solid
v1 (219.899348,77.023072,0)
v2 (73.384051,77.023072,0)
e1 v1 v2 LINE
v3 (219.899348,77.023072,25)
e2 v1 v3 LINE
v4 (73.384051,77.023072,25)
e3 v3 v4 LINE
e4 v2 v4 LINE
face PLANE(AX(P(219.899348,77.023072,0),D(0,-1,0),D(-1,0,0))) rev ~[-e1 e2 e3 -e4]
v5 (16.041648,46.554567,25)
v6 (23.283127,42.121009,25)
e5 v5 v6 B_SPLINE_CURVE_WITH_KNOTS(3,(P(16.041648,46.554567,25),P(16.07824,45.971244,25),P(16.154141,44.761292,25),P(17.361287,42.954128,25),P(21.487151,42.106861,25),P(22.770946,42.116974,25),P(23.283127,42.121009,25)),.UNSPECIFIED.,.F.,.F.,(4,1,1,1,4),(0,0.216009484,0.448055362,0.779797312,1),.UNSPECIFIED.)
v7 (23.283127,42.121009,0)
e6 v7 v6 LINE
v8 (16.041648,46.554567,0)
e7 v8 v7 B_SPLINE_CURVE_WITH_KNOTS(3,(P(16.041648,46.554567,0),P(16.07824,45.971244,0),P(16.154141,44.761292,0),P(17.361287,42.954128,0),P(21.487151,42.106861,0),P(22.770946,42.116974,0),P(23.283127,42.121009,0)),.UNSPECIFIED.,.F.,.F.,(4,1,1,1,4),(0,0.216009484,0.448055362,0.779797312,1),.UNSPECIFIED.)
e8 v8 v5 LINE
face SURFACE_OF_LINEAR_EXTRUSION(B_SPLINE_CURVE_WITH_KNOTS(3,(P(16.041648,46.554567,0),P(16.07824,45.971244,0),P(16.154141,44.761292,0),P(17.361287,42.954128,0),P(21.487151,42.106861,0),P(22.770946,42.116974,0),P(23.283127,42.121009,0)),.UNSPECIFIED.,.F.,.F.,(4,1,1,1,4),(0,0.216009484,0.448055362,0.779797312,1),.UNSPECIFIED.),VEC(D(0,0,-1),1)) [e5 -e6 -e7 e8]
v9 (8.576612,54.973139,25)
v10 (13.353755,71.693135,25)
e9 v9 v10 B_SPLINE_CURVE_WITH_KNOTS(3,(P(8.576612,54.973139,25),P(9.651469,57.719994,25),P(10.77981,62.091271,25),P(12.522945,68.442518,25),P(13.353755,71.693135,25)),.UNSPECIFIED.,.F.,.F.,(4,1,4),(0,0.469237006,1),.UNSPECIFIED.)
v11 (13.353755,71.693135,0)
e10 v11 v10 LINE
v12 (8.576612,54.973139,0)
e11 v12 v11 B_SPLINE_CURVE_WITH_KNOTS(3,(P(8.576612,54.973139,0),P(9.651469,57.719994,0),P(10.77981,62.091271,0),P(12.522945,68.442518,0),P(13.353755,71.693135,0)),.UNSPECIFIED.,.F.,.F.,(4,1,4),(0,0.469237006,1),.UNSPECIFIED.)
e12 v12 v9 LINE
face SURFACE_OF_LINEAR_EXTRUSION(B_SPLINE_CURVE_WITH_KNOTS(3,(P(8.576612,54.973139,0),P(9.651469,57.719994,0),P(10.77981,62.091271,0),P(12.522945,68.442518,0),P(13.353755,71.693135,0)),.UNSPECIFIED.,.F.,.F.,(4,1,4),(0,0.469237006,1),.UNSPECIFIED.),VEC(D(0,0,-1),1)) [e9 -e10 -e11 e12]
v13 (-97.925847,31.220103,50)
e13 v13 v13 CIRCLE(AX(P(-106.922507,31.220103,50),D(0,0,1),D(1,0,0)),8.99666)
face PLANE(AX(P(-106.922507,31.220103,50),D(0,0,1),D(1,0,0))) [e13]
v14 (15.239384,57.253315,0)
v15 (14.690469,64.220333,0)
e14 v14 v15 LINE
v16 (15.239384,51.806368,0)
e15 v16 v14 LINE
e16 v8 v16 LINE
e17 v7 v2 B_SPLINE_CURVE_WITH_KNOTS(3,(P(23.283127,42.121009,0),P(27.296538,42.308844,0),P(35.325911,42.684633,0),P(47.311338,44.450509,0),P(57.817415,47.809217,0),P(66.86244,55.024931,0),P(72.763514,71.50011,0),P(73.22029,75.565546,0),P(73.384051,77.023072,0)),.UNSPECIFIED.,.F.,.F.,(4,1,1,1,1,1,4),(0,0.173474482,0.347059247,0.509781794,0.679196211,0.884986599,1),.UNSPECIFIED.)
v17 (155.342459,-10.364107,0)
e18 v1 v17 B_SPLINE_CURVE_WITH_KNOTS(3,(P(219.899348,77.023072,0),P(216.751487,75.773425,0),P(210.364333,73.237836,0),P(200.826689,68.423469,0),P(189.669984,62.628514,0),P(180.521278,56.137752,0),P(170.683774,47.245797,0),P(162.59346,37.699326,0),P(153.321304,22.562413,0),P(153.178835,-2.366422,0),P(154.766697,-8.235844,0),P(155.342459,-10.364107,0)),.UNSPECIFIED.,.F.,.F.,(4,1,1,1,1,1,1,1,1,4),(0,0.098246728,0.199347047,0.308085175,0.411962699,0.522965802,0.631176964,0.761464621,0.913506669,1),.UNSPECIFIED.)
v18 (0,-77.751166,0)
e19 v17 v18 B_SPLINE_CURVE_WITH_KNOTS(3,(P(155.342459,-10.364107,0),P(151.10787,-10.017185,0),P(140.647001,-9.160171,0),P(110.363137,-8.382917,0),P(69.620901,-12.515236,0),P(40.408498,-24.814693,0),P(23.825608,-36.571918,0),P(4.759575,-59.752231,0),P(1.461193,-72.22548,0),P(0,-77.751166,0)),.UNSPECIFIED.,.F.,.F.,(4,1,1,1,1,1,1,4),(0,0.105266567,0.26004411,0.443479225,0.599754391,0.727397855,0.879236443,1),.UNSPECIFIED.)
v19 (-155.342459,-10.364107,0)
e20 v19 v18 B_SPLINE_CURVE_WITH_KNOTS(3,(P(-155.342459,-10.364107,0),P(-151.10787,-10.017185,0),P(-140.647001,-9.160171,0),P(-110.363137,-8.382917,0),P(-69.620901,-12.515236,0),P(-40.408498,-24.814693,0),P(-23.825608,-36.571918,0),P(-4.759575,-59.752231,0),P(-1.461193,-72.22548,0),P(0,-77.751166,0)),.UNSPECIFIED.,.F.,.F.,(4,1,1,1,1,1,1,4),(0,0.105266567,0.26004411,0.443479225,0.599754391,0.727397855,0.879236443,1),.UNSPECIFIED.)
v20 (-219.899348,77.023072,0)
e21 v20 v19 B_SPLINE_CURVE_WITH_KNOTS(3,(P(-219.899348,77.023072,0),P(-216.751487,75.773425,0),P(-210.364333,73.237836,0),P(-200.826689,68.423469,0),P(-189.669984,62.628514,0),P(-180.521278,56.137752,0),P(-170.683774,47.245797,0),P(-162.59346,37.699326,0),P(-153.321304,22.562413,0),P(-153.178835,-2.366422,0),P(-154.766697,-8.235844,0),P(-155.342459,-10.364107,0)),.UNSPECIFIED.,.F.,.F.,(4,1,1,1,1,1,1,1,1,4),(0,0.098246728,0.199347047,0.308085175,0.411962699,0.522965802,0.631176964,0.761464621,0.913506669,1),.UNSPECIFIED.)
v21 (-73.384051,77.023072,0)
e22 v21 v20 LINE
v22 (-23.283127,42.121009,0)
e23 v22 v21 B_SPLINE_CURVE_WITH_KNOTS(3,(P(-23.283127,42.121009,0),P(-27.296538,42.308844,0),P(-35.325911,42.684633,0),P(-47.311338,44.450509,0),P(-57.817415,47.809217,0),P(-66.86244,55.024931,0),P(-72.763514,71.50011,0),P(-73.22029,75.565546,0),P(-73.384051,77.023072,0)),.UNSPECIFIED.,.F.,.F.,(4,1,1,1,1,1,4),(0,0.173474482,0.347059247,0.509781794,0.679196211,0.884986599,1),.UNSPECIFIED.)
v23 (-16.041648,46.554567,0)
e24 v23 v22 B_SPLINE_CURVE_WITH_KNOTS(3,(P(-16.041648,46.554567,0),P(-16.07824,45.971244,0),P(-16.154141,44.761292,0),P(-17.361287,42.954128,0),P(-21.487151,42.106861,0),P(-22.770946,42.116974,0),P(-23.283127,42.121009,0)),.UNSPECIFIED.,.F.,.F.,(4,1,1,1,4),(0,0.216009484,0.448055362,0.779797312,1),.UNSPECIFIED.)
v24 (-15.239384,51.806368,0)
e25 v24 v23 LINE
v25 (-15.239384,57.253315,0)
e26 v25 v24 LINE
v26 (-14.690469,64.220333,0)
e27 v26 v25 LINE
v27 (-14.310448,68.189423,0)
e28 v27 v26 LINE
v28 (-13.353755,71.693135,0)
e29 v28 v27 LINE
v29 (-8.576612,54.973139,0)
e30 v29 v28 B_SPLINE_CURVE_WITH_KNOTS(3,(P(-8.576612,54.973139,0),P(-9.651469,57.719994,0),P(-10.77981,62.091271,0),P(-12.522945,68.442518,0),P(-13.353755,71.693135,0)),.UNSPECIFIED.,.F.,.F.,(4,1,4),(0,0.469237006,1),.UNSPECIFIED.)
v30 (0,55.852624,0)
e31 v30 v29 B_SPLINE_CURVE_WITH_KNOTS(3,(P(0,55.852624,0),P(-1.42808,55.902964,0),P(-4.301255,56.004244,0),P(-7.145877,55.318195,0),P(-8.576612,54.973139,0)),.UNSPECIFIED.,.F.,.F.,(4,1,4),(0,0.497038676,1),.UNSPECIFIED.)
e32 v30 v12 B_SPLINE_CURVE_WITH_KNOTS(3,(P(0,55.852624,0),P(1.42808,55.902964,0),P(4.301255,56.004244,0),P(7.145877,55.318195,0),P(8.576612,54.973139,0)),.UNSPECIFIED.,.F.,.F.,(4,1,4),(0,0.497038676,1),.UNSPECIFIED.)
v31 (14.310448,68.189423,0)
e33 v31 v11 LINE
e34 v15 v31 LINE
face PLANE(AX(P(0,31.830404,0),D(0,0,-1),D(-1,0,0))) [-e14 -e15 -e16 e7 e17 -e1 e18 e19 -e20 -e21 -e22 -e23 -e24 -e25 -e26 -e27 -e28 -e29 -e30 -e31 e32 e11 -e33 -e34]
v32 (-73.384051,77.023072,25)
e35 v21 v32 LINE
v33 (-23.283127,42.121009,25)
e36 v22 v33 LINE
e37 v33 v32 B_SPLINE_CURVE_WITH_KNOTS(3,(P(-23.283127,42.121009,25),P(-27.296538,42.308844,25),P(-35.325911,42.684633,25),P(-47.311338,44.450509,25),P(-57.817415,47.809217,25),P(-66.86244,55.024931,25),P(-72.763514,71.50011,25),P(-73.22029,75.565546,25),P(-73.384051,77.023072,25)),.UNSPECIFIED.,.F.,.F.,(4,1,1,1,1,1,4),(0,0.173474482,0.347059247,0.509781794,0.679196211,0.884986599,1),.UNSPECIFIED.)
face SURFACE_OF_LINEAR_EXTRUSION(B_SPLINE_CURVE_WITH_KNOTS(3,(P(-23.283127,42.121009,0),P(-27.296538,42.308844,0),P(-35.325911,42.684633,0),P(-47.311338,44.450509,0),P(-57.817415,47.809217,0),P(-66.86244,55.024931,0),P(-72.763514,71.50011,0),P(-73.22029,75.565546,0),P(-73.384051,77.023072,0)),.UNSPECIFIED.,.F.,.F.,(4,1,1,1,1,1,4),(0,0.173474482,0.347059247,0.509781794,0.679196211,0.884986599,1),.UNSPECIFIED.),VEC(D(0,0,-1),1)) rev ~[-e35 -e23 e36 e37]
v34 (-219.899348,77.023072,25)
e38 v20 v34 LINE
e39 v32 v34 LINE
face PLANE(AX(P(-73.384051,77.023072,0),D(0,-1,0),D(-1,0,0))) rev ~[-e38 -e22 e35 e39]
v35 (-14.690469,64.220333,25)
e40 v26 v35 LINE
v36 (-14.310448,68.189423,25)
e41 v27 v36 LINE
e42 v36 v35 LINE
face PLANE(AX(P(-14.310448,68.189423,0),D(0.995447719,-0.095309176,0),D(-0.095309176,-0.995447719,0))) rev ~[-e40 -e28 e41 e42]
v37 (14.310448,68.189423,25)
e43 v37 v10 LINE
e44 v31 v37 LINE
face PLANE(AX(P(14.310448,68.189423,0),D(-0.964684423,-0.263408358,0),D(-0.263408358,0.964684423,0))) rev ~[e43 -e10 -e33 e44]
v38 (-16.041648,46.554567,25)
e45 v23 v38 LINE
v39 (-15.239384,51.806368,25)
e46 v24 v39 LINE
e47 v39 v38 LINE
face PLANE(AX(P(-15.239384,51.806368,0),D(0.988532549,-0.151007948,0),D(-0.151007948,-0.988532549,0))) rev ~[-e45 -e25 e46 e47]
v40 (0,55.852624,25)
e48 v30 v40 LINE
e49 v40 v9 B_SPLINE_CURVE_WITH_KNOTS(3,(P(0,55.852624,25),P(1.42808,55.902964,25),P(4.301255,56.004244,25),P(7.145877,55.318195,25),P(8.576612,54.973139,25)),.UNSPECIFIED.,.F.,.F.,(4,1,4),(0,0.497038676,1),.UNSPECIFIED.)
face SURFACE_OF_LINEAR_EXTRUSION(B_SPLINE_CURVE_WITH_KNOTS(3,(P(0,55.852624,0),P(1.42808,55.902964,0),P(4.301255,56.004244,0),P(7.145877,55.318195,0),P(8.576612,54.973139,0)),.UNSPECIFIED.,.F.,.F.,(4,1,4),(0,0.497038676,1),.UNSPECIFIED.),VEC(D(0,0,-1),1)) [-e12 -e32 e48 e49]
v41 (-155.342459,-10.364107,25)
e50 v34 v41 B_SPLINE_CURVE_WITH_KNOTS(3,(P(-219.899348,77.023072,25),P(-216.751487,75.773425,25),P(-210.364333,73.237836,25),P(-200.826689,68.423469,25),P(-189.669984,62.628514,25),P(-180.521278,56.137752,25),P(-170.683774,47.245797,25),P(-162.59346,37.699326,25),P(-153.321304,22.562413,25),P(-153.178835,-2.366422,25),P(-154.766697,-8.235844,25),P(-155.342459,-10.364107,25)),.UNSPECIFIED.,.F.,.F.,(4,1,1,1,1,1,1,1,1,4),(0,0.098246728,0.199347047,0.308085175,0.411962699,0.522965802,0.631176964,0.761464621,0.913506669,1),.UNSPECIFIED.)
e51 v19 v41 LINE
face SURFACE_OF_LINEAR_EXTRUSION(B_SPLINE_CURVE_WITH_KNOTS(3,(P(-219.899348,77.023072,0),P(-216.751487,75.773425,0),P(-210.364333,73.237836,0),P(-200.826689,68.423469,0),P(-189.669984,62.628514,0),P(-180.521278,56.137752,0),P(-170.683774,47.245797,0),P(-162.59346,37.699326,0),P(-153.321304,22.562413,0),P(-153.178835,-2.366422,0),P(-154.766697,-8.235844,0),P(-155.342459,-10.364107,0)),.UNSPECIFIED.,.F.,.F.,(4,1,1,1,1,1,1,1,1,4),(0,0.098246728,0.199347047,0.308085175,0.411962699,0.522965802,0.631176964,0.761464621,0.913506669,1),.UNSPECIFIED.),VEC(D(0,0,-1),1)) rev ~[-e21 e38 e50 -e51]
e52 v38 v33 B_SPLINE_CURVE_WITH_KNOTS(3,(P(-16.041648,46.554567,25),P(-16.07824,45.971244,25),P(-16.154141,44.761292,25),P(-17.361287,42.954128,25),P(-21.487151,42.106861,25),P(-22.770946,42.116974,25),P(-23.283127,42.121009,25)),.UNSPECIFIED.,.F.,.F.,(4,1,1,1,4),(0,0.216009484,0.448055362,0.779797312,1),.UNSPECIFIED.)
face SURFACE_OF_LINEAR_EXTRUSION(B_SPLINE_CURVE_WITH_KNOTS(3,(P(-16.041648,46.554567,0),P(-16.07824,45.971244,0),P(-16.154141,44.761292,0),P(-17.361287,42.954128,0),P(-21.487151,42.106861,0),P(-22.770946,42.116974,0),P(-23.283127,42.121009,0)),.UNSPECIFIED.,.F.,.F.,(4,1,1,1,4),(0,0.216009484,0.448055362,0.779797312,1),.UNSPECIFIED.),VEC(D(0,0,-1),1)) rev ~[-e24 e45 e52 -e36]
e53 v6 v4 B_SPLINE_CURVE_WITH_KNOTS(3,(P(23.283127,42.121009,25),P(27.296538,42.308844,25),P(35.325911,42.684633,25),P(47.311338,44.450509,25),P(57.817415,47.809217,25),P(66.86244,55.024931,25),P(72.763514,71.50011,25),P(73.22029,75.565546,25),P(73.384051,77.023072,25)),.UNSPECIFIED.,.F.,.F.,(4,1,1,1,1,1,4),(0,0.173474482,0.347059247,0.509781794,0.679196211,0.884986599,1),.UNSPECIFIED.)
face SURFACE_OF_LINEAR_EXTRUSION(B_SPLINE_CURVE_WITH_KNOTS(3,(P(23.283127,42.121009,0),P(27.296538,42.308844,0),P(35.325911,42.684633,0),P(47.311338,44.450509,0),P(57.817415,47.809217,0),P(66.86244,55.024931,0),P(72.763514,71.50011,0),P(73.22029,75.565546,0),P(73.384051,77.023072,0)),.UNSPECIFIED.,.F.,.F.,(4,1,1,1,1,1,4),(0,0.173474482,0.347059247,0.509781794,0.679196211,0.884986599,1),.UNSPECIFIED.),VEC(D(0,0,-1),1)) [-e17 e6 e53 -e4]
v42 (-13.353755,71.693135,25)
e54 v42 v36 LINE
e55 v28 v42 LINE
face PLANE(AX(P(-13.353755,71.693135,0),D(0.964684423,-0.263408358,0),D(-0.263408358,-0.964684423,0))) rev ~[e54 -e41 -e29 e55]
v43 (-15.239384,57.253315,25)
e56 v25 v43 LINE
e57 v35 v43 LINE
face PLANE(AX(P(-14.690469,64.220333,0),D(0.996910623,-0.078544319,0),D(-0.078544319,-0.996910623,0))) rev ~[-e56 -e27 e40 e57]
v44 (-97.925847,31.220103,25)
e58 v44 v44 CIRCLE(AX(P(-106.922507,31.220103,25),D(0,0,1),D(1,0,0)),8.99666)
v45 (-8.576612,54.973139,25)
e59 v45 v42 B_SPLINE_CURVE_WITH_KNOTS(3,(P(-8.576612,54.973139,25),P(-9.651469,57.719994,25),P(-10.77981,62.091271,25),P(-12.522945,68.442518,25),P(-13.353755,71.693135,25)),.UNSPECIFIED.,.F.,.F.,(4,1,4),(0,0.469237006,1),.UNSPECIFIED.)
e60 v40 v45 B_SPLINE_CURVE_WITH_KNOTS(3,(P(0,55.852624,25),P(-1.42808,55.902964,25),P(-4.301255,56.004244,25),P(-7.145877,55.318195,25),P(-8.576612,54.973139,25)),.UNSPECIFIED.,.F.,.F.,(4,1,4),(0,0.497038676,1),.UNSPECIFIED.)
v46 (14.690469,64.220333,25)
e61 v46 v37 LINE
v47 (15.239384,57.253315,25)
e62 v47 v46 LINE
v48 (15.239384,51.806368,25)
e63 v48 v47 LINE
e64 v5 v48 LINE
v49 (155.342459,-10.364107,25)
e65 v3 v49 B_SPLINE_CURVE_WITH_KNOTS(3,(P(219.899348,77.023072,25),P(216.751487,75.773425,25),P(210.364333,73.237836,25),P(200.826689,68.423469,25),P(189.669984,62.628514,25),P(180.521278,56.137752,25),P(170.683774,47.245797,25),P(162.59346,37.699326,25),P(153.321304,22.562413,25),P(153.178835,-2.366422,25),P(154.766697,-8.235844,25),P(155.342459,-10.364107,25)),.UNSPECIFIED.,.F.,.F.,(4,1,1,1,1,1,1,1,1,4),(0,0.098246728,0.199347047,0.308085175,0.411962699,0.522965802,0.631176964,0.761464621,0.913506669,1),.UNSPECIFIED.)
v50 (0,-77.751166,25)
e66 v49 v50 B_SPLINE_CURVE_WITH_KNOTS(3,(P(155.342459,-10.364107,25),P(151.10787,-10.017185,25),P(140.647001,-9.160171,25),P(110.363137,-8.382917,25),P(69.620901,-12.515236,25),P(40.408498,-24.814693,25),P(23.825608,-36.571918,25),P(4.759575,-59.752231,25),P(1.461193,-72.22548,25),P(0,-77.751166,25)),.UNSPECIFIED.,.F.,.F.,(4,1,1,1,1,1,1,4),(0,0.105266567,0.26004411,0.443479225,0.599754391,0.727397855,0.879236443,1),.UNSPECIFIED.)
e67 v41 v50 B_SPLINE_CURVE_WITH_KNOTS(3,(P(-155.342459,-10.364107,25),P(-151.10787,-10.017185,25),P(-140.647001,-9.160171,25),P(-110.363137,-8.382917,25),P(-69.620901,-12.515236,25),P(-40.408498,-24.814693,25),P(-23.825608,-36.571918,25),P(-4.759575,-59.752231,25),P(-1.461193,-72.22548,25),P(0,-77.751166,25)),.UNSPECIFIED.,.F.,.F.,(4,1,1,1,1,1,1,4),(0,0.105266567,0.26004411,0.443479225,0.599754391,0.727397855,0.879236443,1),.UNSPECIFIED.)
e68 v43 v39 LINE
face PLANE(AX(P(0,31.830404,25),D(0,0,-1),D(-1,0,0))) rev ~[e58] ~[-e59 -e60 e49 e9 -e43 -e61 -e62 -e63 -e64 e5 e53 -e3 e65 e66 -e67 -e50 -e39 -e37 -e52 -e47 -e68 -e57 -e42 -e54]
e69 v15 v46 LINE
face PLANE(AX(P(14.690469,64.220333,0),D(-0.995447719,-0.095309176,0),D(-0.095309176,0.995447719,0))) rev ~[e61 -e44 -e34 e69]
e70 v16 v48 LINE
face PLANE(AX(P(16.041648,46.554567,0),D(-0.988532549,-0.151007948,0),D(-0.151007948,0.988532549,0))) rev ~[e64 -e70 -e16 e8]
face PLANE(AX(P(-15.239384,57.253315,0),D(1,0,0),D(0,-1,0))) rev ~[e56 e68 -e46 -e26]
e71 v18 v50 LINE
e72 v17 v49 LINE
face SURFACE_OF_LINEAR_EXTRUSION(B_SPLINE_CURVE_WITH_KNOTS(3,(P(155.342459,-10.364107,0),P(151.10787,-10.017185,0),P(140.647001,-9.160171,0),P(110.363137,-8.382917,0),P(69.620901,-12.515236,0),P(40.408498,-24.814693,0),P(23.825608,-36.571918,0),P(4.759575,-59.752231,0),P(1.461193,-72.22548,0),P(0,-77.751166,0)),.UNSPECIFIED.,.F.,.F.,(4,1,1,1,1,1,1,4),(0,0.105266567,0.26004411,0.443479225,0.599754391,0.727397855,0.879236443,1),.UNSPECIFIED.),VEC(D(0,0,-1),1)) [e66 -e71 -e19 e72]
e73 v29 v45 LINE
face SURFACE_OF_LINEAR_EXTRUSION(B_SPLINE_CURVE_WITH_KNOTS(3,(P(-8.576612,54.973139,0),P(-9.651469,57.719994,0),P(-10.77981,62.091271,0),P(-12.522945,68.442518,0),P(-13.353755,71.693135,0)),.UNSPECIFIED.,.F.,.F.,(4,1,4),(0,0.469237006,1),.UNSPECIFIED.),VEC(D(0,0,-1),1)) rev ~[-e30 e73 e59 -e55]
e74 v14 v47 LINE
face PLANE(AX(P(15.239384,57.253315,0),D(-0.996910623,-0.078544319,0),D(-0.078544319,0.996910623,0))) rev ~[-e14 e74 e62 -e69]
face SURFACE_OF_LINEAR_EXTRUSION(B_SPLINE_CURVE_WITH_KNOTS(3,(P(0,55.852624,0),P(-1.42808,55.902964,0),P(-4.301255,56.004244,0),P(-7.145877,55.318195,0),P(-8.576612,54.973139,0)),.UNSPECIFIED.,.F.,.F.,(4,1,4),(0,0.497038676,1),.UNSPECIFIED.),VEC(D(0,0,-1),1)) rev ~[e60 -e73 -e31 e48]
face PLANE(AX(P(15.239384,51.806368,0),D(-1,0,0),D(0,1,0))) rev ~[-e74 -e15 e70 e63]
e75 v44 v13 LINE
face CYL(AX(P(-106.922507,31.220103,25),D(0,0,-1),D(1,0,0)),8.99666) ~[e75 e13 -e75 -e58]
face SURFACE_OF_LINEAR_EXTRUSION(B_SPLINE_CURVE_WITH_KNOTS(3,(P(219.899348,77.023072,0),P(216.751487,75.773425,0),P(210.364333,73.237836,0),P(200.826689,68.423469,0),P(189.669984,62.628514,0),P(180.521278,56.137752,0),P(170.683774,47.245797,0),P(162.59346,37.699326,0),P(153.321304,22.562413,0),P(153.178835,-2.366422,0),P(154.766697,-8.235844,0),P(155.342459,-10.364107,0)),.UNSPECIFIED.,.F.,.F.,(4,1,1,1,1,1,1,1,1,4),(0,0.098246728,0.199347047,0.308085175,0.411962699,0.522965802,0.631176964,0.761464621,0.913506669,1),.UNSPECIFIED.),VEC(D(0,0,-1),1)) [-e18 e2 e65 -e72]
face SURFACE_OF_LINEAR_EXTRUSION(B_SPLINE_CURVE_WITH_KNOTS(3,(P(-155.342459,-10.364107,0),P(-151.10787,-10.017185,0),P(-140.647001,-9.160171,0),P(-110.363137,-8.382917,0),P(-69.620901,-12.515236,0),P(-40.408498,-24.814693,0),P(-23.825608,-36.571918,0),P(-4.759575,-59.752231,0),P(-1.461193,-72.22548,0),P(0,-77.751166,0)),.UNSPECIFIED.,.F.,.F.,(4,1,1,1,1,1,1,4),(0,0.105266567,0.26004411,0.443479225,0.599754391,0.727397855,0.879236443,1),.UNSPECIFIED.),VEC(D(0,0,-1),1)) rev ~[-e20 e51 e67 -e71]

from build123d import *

# Parameters (mm, degrees)
F1_DEPTH = 25
F2_R     = 8.9966602053
F3_DEPTH = 25


with BuildPart() as f1:
    # F0 (on Top) → F1 (new body)
    with BuildSketch(Plane.XY):
        with BuildLine():
            add(Edge.make_bspline(
                [(0, 55.8526235752), (1.4280795362, 55.9029637891), (4.3012554156, 56.0042440643), (7.1458772439, 55.3181953486), (8.5766120037, 54.9731393785)],
                knots=[0, 0, 0, 0, 0.4970386764, 1, 1, 1, 1], degree=3))
            add(Edge.make_bspline(
                [(0, 55.8526235752), (-1.4280795362, 55.9029637891), (-4.3012554156, 56.0042440643), (-7.1458772439, 55.3181953486), (-8.5766120037, 54.9731393785)],
                knots=[0, 0, 0, 0, 0.4970386764, 1, 1, 1, 1], degree=3))
            add(Edge.make_bspline(
                [(-8.5766120037, 54.9731393785), (-9.6514692623, 57.7199939494), (-10.7798098483, 62.0912705565), (-12.5229449449, 68.4425182702), (-13.3537546584, 71.6931354436)],
                knots=[0, 0, 0, 0, 0.4692370062, 1, 1, 1, 1], degree=3))
            Line((-13.3537546584, 71.6931354436), (-14.3104480225, 68.1894228319))
            Line((-14.3104480225, 68.1894228319), (-14.6904686593, 64.2203330608))
            Line((-14.6904686593, 64.2203330608), (-15.2393841705, 57.2533148191))
            Line((-15.2393841705, 57.2533148191), (-15.2393841705, 51.8063676534))
            Line((-15.2393841705, 51.8063676534), (-16.0416477287, 46.5545669952))
            add(Edge.make_bspline(
                [(-16.0416477287, 46.5545669952), (-16.0782398272, 45.9712438272), (-16.1541405962, 44.7612919849), (-17.36128719, 42.9541275979), (-21.487150658, 42.106860984), (-22.7709461909, 42.1169743448), (-23.2831265938, 42.1210091502)],
                knots=[0, 0, 0, 0, 0.2160094844, 0.4480553625, 0.7797973123, 1, 1, 1, 1], degree=3))
            add(Edge.make_bspline(
                [(-23.2831265938, 42.1210091502), (-27.2965375372, 42.3088440811), (-35.3259108761, 42.6846333556), (-47.3113383189, 44.4505093957), (-57.81741508, 47.8092168889), (-66.8624396005, 55.0249311035), (-72.763514145, 71.5001102031), (-73.2202899067, 75.5655462835), (-73.3840514825, 77.0230715613)],
                knots=[0, 0, 0, 0, 0.1734744818, 0.3470592468, 0.5097817941, 0.6791962113, 0.8849865987, 1, 1, 1, 1], degree=3))
            Line((-73.3840514825, 77.0230715613), (-219.8993484104, 77.0230715613))
            add(Edge.make_bspline(
                [(-219.8993484104, 77.0230715613), (-216.7514866718, 75.7734251957), (-210.364333067, 73.237836294), (-200.8266893884, 68.423468755), (-189.669984007, 62.6285144966), (-180.5212779679, 56.1377515198), (-170.6837735136, 47.2457974455), (-162.5934600363, 37.6993260588), (-153.3213038909, 22.5624126907), (-153.1788353257, -2.3664218304), (-154.7666973105, -8.2358443771), (-155.342458745, -10.3641068946)],
                knots=[0, 0, 0, 0, 0.0982467279, 0.1993470471, 0.3080851749, 0.4119626995, 0.5229658015, 0.6311769641, 0.7614646207, 0.913506669, 1, 1, 1, 1], degree=3))
            add(Edge.make_bspline(
                [(-155.342458745, -10.3641068946), (-151.1078703147, -10.017185236), (-140.6470011893, -9.1601711182), (-110.3631366823, -8.3829172418), (-69.6209011536, -12.5152355728), (-40.4084978403, -24.8146934434), (-23.8256078227, -36.5719180218), (-4.7595753666, -59.7522314236), (-1.4611931069, -72.2254798237), (0, -77.7511657961)],
                knots=[0, 0, 0, 0, 0.1052665669, 0.2600441101, 0.443479225, 0.5997543907, 0.7273978551, 0.8792364427, 1, 1, 1, 1], degree=3))
            add(Edge.make_bspline(
                [(155.342458745, -10.3641068946), (151.1078703147, -10.017185236), (140.6470011893, -9.1601711182), (110.3631366823, -8.3829172418), (69.6209011536, -12.5152355728), (40.4084978403, -24.8146934434), (23.8256078227, -36.5719180218), (4.7595753666, -59.7522314236), (1.4611931069, -72.2254798237), (0, -77.7511657961)],
                knots=[0, 0, 0, 0, 0.1052665669, 0.2600441101, 0.443479225, 0.5997543907, 0.7273978551, 0.8792364427, 1, 1, 1, 1], degree=3))
            add(Edge.make_bspline(
                [(219.8993484104, 77.0230715613), (216.7514866718, 75.7734251957), (210.364333067, 73.237836294), (200.8266893884, 68.423468755), (189.669984007, 62.6285144966), (180.5212779679, 56.1377515198), (170.6837735136, 47.2457974455), (162.5934600363, 37.6993260588), (153.3213038909, 22.5624126907), (153.1788353257, -2.3664218304), (154.7666973105, -8.2358443771), (155.342458745, -10.3641068946)],
                knots=[0, 0, 0, 0, 0.0982467279, 0.1993470471, 0.3080851749, 0.4119626995, 0.5229658015, 0.6311769641, 0.7614646207, 0.913506669, 1, 1, 1, 1], degree=3))
            Line((219.8993484104, 77.0230715613), (73.3840514825, 77.0230715613))
            add(Edge.make_bspline(
                [(23.2831265938, 42.1210091502), (27.2965375372, 42.3088440811), (35.3259108761, 42.6846333556), (47.3113383189, 44.4505093957), (57.81741508, 47.8092168889), (66.8624396005, 55.0249311035), (72.763514145, 71.5001102031), (73.2202899067, 75.5655462835), (73.3840514825, 77.0230715613)],
                knots=[0, 0, 0, 0, 0.1734744818, 0.3470592468, 0.5097817941, 0.6791962113, 0.8849865987, 1, 1, 1, 1], degree=3))
            add(Edge.make_bspline(
                [(16.0416477287, 46.5545669952), (16.0782398272, 45.9712438272), (16.1541405962, 44.7612919849), (17.36128719, 42.9541275979), (21.487150658, 42.106860984), (22.7709461909, 42.1169743448), (23.2831265938, 42.1210091502)],
                knots=[0, 0, 0, 0, 0.2160094844, 0.4480553625, 0.7797973123, 1, 1, 1, 1], degree=3))
            Line((16.0416477287, 46.5545669952), (15.2393841705, 51.8063676534))
            Line((15.2393841705, 51.8063676534), (15.2393841705, 57.2533148191))
            Line((15.2393841705, 57.2533148191), (14.6904686593, 64.2203330608))
            Line((14.6904686593, 64.2203330608), (14.3104480225, 68.1894228319))
            Line((14.3104480225, 68.1894228319), (13.3537546584, 71.6931354436))
            add(Edge.make_bspline(
                [(8.5766120037, 54.9731393785), (9.6514692623, 57.7199939494), (10.7798098483, 62.0912705565), (12.5229449449, 68.4425182702), (13.3537546584, 71.6931354436)],
                knots=[0, 0, 0, 0, 0.4692370062, 1, 1, 1, 1], degree=3))
        make_face()
    extrude(amount=F1_DEPTH)

    # F2 (on face) → F3 (join)
    with BuildSketch(Plane.XY.offset(25)):
        with Locations((-106.9225072861, 31.2201026827)):
            Circle(F2_R)
    extrude(amount=F3_DEPTH)


solid = f1.part
